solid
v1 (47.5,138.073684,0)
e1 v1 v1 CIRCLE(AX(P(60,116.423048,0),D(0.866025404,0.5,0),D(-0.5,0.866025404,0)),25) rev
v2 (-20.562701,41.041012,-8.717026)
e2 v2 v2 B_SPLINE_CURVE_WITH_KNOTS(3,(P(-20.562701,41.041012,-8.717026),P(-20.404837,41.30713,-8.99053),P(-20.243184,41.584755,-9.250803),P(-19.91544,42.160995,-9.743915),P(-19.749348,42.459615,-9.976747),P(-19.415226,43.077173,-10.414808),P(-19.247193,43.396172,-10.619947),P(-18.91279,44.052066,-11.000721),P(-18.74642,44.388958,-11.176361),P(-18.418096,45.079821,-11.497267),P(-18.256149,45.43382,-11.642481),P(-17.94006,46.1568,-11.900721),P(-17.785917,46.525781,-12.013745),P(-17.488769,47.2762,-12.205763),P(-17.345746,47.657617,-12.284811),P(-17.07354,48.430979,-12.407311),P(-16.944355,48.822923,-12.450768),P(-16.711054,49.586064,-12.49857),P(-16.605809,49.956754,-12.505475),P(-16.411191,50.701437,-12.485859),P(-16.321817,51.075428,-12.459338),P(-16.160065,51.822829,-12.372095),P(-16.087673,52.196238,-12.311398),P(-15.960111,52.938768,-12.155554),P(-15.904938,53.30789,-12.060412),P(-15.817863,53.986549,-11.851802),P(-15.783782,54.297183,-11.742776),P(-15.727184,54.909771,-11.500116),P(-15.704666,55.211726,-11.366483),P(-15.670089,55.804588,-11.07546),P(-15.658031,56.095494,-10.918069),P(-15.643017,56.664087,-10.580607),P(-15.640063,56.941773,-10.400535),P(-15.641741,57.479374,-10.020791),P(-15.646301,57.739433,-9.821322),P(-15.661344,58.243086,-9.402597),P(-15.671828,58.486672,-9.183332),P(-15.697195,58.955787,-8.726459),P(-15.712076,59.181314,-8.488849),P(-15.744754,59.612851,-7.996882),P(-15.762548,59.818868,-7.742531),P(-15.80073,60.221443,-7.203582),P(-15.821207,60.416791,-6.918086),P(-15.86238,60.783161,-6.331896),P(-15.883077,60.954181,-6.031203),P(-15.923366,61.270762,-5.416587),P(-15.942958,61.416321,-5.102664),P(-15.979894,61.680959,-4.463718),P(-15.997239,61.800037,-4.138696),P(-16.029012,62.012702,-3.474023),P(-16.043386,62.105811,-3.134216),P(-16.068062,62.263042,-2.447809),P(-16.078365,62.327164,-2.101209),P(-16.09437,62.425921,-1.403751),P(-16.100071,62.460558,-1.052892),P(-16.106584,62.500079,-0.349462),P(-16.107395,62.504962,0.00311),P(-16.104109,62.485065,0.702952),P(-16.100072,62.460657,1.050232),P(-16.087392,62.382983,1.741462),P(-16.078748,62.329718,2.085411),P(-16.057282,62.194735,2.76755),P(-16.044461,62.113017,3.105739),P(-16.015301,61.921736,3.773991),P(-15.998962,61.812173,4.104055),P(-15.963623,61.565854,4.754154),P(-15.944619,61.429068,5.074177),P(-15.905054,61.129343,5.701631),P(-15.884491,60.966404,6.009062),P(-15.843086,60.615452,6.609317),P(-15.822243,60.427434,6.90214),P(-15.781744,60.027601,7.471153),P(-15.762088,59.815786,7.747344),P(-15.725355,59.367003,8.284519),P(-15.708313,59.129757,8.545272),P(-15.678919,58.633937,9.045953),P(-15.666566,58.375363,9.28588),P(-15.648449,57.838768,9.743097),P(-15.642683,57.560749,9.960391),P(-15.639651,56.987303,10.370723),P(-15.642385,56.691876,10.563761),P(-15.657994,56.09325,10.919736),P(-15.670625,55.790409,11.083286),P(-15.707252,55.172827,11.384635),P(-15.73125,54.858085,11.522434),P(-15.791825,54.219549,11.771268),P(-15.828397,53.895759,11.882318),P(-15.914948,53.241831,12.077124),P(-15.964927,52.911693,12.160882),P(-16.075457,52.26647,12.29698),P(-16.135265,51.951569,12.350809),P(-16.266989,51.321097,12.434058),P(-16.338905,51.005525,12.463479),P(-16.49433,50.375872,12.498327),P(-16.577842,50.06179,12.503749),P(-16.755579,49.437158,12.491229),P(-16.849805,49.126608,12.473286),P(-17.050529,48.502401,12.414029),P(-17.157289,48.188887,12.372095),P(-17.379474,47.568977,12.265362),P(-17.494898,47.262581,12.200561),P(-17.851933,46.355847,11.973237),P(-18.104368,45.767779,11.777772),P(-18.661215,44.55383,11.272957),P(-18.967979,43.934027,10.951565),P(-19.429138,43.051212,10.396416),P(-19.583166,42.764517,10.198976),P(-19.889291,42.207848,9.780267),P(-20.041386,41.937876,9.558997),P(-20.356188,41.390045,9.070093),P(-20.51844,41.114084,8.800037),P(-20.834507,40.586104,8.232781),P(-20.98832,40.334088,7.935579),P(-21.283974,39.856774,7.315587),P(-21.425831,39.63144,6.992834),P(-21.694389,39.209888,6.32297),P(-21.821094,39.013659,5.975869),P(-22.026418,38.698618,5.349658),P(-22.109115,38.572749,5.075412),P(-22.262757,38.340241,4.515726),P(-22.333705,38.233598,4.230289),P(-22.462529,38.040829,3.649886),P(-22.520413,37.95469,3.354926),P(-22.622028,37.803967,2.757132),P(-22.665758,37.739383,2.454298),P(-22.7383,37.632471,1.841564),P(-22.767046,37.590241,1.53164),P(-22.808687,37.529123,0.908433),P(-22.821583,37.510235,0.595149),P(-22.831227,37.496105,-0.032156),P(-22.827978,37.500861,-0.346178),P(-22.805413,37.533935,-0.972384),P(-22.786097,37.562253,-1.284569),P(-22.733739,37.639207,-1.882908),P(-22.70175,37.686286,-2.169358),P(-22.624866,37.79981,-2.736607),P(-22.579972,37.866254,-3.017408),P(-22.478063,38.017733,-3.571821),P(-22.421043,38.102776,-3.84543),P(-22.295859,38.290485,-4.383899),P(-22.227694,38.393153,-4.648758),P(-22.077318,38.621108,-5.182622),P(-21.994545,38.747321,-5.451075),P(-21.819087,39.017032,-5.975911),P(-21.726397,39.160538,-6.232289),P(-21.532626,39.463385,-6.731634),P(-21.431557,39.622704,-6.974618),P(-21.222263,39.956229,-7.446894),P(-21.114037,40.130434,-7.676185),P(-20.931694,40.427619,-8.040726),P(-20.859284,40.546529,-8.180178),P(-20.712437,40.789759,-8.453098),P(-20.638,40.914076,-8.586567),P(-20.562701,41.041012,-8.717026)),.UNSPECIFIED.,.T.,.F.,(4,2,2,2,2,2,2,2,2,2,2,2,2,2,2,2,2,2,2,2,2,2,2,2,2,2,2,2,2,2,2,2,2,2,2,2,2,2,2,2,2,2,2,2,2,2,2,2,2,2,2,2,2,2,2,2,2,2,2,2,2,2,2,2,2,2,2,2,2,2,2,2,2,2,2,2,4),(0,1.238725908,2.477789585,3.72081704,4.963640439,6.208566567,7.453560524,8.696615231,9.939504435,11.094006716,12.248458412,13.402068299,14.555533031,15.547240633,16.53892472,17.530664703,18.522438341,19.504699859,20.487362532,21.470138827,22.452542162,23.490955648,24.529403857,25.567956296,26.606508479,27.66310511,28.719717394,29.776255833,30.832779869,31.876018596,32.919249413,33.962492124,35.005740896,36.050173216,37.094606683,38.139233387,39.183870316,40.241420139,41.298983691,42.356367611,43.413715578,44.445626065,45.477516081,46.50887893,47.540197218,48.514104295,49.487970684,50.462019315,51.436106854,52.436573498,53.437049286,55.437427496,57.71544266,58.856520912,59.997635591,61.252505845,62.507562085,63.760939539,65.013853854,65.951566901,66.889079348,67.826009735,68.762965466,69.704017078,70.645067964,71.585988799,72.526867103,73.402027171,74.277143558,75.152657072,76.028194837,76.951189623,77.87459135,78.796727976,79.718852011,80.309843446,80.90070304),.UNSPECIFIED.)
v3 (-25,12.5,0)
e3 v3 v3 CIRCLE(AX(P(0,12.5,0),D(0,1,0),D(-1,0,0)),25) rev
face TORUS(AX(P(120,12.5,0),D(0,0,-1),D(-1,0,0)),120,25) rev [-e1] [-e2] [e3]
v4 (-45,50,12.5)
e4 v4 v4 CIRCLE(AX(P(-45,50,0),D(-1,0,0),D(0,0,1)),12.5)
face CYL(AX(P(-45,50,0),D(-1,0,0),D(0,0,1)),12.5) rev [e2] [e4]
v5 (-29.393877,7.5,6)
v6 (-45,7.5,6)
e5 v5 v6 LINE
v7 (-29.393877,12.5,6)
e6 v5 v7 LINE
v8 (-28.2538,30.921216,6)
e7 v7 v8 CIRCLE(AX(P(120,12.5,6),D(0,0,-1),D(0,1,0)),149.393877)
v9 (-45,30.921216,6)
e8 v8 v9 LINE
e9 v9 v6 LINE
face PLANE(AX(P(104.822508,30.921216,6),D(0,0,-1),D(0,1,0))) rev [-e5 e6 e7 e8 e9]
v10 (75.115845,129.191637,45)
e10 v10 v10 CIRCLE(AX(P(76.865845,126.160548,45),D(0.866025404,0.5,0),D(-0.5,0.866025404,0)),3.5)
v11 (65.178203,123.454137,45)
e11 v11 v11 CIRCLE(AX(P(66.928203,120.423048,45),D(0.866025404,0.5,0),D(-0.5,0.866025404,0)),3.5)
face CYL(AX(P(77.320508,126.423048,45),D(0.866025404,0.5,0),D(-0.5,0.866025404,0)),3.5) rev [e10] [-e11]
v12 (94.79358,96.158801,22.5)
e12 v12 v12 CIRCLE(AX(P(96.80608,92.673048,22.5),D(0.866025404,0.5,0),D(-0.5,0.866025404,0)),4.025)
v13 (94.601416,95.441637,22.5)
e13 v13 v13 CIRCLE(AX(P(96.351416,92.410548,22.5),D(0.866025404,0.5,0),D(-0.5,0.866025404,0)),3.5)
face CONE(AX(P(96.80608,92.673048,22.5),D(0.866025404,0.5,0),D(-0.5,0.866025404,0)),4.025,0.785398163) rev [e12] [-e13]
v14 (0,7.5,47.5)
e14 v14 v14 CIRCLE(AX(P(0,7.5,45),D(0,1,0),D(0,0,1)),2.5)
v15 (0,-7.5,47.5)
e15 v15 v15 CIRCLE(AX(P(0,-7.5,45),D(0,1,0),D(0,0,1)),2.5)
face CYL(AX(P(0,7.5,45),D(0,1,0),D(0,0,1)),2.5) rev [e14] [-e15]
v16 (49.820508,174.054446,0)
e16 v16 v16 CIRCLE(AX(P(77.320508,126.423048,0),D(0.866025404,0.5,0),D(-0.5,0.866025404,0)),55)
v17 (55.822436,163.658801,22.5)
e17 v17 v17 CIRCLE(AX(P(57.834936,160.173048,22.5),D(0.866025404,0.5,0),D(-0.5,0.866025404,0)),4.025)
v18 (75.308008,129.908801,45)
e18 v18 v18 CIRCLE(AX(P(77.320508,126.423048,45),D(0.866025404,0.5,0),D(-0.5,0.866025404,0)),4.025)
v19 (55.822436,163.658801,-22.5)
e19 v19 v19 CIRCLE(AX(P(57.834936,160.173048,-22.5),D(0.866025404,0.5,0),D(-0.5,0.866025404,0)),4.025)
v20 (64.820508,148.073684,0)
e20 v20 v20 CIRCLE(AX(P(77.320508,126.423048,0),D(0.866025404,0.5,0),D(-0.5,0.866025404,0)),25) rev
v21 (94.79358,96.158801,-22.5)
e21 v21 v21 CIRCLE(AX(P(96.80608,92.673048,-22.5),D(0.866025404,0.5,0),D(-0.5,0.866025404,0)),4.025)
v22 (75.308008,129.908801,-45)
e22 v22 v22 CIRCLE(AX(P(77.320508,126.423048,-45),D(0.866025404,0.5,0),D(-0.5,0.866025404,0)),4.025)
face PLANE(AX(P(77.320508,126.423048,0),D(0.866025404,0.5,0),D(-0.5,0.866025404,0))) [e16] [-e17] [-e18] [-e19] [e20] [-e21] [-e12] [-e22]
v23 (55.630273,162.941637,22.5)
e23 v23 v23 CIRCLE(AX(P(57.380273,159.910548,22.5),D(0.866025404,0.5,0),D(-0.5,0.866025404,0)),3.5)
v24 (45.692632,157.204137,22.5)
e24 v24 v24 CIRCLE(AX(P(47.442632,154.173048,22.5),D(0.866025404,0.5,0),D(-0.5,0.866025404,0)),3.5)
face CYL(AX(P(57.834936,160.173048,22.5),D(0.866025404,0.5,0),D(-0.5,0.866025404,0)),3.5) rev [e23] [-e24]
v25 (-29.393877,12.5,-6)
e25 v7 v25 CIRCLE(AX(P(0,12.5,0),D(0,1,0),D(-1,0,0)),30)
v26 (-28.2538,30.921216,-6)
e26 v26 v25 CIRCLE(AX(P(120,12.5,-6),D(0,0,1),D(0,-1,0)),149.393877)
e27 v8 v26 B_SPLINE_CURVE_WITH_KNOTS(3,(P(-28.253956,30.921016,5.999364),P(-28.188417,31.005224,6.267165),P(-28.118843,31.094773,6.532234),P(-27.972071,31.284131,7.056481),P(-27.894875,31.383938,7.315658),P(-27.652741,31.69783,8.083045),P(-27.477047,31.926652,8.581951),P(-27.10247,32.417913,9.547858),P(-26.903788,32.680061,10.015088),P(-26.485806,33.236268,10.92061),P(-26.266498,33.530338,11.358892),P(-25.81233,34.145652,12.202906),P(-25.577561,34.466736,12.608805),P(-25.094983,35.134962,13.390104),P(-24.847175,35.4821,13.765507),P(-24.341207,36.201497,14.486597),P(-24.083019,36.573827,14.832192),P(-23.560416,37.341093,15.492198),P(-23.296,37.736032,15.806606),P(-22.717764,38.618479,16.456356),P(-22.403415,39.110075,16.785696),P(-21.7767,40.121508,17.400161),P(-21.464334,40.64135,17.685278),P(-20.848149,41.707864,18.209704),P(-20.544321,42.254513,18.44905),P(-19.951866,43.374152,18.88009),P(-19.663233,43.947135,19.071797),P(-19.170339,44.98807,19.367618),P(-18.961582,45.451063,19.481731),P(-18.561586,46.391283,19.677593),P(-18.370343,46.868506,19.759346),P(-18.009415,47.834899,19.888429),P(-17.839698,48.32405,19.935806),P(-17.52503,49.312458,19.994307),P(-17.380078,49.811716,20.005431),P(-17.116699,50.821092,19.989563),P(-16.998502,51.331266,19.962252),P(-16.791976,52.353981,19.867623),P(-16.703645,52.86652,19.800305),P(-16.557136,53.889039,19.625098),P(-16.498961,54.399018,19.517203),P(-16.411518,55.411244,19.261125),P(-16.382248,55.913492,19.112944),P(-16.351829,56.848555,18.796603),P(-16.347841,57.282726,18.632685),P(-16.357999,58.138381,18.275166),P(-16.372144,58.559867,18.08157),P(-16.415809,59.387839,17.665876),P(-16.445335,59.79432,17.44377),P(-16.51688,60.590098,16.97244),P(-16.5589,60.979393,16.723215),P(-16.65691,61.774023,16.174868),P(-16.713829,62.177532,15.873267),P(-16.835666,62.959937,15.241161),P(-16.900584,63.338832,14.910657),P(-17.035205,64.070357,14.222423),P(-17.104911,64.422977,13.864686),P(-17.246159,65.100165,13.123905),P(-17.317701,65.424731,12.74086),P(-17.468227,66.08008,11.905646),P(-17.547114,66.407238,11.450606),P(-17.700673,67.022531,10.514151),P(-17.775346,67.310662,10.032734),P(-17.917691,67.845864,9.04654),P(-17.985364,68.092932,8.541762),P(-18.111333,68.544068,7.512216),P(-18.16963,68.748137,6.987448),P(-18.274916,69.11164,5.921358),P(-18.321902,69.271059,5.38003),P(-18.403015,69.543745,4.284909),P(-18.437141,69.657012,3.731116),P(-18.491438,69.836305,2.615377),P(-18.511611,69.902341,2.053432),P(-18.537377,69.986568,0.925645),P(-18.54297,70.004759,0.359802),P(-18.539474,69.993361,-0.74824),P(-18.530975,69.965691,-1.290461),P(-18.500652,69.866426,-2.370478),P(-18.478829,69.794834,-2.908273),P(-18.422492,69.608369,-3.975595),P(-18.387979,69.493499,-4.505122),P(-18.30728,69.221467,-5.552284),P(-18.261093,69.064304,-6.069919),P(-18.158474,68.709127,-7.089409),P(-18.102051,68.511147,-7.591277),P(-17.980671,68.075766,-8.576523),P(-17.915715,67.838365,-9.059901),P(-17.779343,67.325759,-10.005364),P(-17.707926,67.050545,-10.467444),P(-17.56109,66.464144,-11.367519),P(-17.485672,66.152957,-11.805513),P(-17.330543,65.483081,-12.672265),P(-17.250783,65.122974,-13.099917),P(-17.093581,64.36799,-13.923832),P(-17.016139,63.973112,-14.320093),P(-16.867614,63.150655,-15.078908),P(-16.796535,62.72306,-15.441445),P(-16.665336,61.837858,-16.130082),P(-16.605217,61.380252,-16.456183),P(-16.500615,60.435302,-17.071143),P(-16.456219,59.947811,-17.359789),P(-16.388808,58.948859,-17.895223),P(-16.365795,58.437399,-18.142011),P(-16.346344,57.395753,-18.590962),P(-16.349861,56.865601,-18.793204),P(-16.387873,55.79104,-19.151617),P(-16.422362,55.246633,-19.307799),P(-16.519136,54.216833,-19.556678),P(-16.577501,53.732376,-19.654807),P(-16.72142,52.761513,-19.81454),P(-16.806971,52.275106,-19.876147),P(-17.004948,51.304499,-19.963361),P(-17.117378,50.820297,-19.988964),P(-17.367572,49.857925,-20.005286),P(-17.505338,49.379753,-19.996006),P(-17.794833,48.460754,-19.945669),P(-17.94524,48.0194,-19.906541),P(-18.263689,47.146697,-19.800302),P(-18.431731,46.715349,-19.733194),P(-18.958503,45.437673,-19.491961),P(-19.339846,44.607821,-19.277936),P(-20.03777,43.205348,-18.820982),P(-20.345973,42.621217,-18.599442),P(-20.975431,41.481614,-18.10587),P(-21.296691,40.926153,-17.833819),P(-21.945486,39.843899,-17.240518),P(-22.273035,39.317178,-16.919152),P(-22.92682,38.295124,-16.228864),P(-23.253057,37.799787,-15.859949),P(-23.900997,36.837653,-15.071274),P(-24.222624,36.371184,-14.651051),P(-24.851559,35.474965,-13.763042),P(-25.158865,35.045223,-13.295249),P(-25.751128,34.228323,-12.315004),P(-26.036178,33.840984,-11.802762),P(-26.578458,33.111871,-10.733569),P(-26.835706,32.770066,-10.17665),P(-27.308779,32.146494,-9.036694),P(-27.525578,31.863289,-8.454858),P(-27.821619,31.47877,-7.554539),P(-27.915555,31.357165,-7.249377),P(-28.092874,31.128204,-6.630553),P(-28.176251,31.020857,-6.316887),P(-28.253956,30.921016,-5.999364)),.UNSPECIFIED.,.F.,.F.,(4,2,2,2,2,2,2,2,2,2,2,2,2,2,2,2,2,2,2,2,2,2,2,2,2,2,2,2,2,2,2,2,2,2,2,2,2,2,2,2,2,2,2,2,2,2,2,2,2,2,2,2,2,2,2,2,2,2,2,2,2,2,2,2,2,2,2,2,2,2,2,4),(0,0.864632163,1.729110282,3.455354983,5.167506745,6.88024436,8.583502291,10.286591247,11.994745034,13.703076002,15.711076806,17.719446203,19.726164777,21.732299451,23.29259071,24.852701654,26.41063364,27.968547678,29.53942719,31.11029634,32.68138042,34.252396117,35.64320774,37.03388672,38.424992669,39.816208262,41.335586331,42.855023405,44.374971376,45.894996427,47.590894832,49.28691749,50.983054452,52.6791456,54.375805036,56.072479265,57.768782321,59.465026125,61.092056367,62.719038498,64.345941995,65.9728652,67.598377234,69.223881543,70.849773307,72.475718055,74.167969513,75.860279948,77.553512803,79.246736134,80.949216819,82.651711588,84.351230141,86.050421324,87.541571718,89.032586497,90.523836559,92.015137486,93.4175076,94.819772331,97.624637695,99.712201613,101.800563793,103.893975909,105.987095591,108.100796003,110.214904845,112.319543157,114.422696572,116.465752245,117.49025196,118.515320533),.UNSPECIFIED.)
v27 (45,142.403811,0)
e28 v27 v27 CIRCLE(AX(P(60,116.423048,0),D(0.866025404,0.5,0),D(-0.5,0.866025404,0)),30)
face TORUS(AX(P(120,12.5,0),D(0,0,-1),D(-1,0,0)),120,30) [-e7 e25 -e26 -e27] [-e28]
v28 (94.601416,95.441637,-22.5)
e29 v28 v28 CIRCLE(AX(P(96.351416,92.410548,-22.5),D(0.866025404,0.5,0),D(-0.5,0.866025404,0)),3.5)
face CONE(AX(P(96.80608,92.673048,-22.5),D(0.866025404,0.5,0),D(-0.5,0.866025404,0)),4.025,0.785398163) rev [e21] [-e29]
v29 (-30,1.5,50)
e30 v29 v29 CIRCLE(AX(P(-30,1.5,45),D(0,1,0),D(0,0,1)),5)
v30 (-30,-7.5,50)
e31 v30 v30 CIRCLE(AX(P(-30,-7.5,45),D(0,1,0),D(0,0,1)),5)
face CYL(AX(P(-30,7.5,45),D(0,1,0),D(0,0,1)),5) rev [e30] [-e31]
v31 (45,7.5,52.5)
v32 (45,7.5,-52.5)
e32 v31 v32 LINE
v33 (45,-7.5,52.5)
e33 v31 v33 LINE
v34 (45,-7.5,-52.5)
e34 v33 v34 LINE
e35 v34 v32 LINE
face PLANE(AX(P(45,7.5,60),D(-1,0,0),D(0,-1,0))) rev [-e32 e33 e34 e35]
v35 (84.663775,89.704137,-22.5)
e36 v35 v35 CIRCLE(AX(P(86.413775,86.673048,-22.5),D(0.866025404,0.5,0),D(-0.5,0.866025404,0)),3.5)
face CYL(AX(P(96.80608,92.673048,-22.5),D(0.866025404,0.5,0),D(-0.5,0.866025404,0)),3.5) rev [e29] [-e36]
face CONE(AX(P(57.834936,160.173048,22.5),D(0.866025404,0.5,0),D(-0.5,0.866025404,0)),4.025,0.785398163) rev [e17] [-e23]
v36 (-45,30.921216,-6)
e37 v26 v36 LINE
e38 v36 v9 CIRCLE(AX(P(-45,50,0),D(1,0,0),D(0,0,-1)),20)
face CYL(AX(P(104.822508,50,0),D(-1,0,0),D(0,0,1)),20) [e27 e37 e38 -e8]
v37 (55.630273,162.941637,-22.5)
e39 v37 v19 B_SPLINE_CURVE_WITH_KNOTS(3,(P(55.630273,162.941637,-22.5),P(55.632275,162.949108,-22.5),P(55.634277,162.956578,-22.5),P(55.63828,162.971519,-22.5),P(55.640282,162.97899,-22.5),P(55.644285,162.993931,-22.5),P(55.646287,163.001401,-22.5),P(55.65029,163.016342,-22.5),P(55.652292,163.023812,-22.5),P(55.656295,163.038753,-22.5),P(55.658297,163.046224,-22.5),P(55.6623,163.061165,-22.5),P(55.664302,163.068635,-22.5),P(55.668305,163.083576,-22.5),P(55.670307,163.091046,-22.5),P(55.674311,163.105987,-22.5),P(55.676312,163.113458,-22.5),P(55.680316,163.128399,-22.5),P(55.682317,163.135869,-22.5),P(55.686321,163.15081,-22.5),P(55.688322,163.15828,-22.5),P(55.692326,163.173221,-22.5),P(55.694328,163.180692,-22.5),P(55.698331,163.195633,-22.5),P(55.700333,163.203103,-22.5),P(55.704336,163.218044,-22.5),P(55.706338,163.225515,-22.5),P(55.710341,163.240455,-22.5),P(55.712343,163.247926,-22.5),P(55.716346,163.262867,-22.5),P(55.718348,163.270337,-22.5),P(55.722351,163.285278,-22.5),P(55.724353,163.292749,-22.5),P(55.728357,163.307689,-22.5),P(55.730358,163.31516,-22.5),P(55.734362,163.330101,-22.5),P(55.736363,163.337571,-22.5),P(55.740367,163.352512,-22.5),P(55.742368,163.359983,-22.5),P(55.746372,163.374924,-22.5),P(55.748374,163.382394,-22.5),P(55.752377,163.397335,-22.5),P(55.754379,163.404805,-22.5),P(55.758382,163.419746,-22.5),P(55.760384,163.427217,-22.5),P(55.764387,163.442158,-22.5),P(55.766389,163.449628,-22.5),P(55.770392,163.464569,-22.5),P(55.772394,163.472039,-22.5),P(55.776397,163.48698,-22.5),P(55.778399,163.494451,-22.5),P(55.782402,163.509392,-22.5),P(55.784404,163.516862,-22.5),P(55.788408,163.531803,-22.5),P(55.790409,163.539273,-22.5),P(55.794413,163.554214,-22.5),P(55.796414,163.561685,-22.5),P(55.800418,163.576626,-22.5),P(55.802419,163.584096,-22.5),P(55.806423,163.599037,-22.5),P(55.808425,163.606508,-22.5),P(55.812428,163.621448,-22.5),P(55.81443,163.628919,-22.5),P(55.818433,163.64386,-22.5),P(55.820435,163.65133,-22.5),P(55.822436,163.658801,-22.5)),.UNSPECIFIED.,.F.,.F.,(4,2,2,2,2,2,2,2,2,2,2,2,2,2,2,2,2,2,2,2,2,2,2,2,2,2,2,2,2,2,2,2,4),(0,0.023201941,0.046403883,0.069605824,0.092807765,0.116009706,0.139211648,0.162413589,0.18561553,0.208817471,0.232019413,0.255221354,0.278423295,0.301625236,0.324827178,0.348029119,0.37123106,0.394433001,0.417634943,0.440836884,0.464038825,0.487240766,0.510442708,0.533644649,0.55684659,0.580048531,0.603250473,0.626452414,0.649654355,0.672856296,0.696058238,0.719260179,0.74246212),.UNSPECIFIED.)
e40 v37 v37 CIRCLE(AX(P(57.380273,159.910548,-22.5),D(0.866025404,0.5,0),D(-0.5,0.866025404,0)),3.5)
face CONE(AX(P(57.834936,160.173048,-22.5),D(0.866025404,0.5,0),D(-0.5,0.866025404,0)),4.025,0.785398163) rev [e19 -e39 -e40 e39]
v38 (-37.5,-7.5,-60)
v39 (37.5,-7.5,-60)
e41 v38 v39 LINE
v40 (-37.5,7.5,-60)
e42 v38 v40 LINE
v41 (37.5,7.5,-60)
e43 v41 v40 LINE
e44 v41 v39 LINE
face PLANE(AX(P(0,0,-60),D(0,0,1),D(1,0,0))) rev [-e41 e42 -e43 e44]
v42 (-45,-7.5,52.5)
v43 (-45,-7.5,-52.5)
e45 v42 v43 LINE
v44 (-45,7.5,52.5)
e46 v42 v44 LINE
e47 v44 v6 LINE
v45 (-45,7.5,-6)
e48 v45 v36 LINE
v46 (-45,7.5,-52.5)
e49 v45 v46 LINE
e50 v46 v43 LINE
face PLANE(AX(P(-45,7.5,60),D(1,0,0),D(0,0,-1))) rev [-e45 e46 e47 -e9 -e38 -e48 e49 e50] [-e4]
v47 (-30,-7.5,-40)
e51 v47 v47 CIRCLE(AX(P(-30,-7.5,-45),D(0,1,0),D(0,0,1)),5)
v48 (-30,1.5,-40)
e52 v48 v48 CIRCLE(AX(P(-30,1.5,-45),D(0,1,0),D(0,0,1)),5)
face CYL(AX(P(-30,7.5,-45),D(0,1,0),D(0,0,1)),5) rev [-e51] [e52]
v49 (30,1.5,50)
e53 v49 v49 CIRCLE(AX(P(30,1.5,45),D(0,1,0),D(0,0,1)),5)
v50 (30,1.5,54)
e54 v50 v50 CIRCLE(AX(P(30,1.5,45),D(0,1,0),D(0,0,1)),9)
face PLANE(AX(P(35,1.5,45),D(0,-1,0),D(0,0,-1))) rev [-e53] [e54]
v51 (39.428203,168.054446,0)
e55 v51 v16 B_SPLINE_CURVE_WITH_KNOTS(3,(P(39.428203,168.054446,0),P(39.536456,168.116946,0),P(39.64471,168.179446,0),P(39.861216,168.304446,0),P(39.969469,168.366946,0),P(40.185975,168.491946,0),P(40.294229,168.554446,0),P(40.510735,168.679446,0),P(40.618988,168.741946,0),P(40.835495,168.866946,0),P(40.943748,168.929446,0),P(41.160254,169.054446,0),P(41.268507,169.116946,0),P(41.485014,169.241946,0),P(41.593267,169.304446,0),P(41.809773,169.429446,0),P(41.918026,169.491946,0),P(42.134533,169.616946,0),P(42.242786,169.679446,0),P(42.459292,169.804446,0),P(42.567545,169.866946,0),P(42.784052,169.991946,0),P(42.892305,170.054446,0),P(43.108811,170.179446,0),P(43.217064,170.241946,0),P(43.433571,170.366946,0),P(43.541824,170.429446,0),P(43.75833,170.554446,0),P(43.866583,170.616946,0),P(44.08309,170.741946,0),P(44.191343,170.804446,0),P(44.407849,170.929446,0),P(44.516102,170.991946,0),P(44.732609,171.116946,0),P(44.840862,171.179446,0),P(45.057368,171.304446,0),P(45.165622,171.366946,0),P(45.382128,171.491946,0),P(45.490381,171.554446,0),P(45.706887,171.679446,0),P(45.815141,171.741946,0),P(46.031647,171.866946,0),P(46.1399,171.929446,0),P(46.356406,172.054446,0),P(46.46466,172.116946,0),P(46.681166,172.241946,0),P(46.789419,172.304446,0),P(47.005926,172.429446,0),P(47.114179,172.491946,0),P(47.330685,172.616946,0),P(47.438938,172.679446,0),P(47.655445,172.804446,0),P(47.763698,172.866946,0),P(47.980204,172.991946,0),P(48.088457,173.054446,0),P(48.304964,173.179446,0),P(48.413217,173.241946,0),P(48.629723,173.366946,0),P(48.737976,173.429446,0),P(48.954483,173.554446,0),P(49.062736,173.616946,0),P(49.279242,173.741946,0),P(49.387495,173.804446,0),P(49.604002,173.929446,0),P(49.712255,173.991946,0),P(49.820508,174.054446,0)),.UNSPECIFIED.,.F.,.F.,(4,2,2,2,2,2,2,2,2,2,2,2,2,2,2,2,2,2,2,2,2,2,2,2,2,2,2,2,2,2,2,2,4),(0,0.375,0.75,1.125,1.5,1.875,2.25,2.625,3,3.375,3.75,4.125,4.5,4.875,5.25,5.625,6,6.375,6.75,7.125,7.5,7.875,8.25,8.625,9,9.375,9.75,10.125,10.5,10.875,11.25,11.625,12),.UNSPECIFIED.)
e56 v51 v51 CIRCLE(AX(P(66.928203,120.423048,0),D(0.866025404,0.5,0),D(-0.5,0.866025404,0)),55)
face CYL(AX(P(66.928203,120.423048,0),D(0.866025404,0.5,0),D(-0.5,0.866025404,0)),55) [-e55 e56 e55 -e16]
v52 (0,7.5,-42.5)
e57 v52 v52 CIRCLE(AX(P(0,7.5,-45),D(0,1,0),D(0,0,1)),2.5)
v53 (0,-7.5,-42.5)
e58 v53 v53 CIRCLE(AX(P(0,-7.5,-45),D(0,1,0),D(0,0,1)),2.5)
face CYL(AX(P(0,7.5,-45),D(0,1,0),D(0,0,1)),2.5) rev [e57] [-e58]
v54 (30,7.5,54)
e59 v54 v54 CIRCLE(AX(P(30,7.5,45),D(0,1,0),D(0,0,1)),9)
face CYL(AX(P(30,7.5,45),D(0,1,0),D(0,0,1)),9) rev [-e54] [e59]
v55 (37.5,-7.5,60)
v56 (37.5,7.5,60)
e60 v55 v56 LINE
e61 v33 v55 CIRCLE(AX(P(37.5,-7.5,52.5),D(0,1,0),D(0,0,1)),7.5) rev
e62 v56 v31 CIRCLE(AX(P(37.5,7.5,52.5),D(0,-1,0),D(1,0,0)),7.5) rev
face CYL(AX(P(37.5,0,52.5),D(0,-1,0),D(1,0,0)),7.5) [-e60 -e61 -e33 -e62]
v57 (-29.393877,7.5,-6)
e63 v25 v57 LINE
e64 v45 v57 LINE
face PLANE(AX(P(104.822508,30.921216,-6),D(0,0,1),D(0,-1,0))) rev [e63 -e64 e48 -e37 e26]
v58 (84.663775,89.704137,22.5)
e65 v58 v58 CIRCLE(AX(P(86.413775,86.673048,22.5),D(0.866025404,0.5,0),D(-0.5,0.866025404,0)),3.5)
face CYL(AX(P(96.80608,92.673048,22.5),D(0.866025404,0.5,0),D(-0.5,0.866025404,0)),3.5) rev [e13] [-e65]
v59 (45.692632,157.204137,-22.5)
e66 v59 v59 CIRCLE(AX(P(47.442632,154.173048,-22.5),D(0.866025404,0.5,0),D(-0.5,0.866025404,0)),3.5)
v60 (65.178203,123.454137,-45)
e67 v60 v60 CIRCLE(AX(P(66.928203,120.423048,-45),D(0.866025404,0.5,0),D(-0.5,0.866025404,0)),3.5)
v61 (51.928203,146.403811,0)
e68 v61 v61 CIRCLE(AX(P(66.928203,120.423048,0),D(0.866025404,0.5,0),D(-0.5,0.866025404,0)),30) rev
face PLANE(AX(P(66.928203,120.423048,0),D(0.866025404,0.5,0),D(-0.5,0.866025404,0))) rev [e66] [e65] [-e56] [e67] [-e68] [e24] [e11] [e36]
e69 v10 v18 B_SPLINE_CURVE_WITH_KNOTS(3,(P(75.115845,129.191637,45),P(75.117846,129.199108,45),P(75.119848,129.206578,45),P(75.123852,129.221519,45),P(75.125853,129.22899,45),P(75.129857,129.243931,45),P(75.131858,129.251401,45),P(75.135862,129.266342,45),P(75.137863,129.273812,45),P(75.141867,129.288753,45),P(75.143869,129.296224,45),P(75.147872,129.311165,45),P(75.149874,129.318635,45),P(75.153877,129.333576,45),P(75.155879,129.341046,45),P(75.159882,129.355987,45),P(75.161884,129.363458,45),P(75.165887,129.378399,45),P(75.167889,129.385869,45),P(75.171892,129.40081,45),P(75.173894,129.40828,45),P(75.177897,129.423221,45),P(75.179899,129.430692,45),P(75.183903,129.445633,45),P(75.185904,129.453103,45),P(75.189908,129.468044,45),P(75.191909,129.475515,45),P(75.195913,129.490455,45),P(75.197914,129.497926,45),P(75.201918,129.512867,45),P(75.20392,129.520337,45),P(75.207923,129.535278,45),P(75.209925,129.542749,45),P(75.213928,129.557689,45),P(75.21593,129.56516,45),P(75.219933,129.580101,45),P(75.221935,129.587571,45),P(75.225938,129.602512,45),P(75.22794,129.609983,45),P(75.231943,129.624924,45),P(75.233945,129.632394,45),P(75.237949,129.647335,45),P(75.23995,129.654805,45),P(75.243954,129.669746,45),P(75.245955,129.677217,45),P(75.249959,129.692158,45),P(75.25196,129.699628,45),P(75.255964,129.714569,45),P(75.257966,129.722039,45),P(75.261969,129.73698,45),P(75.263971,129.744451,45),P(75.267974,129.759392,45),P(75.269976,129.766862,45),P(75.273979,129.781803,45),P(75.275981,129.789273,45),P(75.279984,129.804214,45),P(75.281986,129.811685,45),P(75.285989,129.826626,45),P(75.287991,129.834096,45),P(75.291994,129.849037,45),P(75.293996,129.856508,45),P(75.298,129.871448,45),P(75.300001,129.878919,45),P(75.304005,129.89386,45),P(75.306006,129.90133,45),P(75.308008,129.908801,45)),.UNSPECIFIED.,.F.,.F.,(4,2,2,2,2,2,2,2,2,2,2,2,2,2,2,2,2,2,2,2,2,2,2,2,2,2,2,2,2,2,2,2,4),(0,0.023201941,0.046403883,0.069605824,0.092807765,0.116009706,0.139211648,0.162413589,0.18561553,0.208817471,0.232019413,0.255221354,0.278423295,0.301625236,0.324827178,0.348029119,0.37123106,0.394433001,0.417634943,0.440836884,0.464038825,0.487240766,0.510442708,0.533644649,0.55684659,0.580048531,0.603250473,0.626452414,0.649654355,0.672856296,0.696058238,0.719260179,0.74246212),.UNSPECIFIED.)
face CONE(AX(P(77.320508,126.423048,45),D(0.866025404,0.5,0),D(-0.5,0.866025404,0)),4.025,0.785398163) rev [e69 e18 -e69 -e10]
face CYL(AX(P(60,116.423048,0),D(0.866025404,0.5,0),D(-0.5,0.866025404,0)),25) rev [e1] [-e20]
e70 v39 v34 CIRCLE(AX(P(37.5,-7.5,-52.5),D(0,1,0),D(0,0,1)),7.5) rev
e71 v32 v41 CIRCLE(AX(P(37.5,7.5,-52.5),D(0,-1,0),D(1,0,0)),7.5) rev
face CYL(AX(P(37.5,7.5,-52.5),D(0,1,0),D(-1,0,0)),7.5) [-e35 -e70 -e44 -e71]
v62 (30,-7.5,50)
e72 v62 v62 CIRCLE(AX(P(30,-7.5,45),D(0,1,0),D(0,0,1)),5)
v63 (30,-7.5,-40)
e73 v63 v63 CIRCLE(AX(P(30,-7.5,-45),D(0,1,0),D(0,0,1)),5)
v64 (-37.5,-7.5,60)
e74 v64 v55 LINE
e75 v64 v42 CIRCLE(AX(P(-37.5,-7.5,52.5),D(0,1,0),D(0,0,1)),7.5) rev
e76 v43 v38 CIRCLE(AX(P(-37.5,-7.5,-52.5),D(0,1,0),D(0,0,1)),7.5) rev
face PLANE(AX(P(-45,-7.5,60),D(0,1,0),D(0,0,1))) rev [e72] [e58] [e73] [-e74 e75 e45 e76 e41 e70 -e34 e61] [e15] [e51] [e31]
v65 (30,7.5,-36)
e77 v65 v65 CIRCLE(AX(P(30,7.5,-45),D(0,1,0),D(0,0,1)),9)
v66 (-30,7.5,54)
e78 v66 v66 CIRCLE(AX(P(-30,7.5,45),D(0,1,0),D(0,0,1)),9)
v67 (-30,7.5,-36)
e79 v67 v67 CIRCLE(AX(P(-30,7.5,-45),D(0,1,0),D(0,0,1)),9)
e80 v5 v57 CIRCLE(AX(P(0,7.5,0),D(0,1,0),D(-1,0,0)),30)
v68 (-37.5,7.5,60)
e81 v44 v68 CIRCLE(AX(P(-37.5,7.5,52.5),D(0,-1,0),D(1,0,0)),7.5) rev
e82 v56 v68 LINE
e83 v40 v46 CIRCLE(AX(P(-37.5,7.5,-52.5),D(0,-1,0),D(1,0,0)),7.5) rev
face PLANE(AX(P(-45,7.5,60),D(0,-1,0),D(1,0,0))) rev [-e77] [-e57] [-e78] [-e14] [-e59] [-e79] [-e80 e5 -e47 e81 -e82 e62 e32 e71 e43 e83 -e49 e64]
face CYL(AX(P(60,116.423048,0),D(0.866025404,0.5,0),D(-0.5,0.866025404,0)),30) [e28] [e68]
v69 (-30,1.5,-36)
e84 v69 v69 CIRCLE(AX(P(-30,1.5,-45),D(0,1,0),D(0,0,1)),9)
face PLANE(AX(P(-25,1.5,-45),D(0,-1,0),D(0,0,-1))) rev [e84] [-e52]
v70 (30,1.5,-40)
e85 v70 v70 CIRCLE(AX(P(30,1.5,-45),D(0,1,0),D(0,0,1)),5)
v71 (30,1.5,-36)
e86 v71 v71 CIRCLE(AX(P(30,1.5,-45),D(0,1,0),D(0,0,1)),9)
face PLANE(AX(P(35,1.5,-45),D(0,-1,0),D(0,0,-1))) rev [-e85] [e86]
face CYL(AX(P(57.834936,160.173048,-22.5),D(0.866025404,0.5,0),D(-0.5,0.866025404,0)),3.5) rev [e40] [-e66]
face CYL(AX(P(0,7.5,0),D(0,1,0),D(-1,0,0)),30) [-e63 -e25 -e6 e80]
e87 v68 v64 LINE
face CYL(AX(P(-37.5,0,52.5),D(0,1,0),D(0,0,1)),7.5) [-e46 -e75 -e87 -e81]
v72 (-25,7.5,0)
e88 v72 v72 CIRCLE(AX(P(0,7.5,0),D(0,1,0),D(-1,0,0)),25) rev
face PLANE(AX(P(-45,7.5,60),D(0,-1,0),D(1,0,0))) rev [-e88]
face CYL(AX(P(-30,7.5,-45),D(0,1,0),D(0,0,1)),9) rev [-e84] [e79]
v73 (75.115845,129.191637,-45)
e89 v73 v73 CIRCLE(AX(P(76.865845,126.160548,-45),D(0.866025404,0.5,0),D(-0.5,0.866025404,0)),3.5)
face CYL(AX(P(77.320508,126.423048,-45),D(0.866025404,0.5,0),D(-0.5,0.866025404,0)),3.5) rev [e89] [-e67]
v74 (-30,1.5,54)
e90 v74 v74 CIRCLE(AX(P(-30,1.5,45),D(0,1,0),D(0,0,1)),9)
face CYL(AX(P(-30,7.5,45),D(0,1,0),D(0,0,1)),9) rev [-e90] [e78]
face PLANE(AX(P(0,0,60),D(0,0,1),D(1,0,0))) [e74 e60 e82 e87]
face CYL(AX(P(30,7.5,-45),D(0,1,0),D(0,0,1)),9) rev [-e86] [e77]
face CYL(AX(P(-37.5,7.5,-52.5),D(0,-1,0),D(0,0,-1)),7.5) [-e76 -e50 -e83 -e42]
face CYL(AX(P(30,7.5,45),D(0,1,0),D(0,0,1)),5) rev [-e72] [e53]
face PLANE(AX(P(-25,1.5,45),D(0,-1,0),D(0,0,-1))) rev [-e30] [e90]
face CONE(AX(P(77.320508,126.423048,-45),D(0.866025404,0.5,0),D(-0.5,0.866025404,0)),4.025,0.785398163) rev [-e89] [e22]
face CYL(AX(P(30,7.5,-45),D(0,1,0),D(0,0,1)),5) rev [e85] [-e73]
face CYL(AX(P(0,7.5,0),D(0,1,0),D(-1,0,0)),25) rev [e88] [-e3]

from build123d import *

# Parameters (mm, degrees)
SKETCH1_W                       = 90
SKETCH1_H                       = 15
BOSS_EXTRUDE1_DEPTH             = 60
SKETCH3_R                       = 30
SKETCH3_R_2                     = 25
SKETCH4_R                       = 55
SKETCH4_R_2                     = 25
BOSS_EXTRUDE2_DEPTH             = 12
M8X1_0_TAPPED_HOLE1_D           = 7
M8X1_0_TAPPED_HOLE1_CSINK_D     = 8.05
M8X1_0_TAPPED_HOLE1_CSINK_ANGLE = 90
FILLET1_R                       = 7.5
HOLE2_D                         = 10
HOLE2_CBORE_D                   = 18
HOLE2_CBORE_DEPTH               = 6
MIRROR2_COPY_1_D                = 10
MIRROR2_COPY_1_CBORE_D          = 18
MIRROR2_COPY_1_CBORE_DEPTH      = 6
HOLE3_D                         = 5
BOSS_EXTRUDE3_REACH             = 239.363
HOLE4_REACH                     = 239.363
HOLE4_BORE_R                    = 12.5


# Read off the part's stored shape, not the designer's step: CirPattern1
with BuildPart() as part:
    # Sketch1 → Boss-Extrude1 (new, symmetric)
    with BuildSketch(Plane.XY):
        Rectangle(SKETCH1_W, SKETCH1_H)
    extrude(amount=BOSS_EXTRUDE1_DEPTH, both=True)

    # Sweep1: sweep along a path in Sketch2
    with BuildLine(Plane.XY) as sweep1_path:
        Line((0, 7.5), (0, 12.5))
        ThreePointArc((0, 12.5), (16.076951546, 72.5), (60, 116.423048454))
        Line((60, 116.423048454), (77.320508076, 126.423048454))
    # Sketch3 → Sweep1 (sweep)
    with BuildSketch(Plane(origin=(0, 7.5, 0), x_dir=(1, 0, 0), z_dir=(0, 1, 0))):
        Circle(SKETCH3_R)
        Circle(SKETCH3_R_2, mode=Mode.SUBTRACT)
    sweep(path=sweep1_path.line)

    # Sketch4 → Boss-Extrude2 (add)
    with BuildSketch(Plane(origin=(112.733166849, 65.086524227, 0), x_dir=(0, 0, -1), z_dir=(0.8660254037844357, 0.5000000000000052, 0))):
        with Locations(Location((0, 70.825317547, 0), (0, 0, 90))):
            Circle(SKETCH4_R)
        with Locations(Location((0, 70.825317547, 0), (0, 0, 90))):
            Circle(SKETCH4_R_2, mode=Mode.SUBTRACT)
    extrude(amount=-BOSS_EXTRUDE2_DEPTH)

    # M8x1.0 Tapped Hole1 (through all)
    with Locations(Plane(origin=(112.733166849, 65.086524227, 0), x_dir=(0, 0, -1), z_dir=(0.8660254037844357, 0.5000000000000052, 0))):
        with Locations((45, 70.825317547)):
            CounterSinkHole(M8X1_0_TAPPED_HOLE1_D / 2, M8X1_0_TAPPED_HOLE1_CSINK_D / 2, counter_sink_angle=M8X1_0_TAPPED_HOLE1_CSINK_ANGLE)

    # CirPattern1 outline → CirPattern1 (revolve, cut)
    with BuildSketch(Plane(origin=(-15.927087189, 27.586524227, -22.5), x_dir=(0.5000000000000049, -0.8660254037844358, 0), z_dir=(0, 0, 1))):
        Polygon((0, 118.173048454), (3.5, 118.173048454), (3.5, 129.648048454), (4.025, 130.173048454), (0, 130.173048454), align=None)
    revolve(axis=Axis((-15.927087189, 27.586524227, -22.5), (0.8660254037844358, 0.5000000000000049, 0)), mode=Mode.SUBTRACT)

    # CirPattern1 2 outline → CirPattern1 2 (revolve, cut)
    with BuildSketch(Plane(origin=(-15.927087189, 27.586524227, 22.5), x_dir=(0.500000000000004, -0.8660254037844363, 0), z_dir=(0, 0, 1))):
        Polygon((0, 118.173048454), (3.5, 118.173048454), (3.5, 129.648048454), (4.025, 130.173048454), (0, 130.173048454), align=None)
    revolve(axis=Axis((-15.927087189, 27.586524227, 22.5), (0.8660254037844363, 0.500000000000004, 0)), mode=Mode.SUBTRACT)

    # CirPattern1 3 outline → CirPattern1 3 (revolve, cut)
    with BuildSketch(Plane(origin=(-35.412658774, 61.336524227, 45), x_dir=(0.500000000000004, -0.8660254037844363, 0), z_dir=(0, 0, 1))):
        Polygon((0, 118.173048454), (3.5, 118.173048454), (3.5, 129.648048454), (4.025, 130.173048454), (0, 130.173048454), align=None)
    revolve(axis=Axis((-35.412658774, 61.336524227, 45), (0.8660254037844363, 0.500000000000004, 0)), mode=Mode.SUBTRACT)

    # CirPattern1 4 outline → CirPattern1 4 (revolve, cut)
    with BuildSketch(Plane(origin=(-54.898230359, 95.086524227, 22.5), x_dir=(0.5000000000000049, -0.8660254037844358, 0), z_dir=(0, 0, 1))):
        Polygon((0, 118.173048454), (3.5, 118.173048454), (3.5, 129.648048454), (4.025, 130.173048454), (0, 130.173048454), align=None)
    revolve(axis=Axis((-54.898230359, 95.086524227, 22.5), (0.8660254037844358, 0.5000000000000049, 0)), mode=Mode.SUBTRACT)

    # CirPattern1 5 outline → CirPattern1 5 (revolve, cut)
    with BuildSketch(Plane(origin=(-54.898230359, 95.086524227, -22.5), x_dir=(0.5000000000000049, -0.8660254037844358, 0), z_dir=(0, 0, 1))):
        Polygon((0, 118.173048454), (3.5, 118.173048454), (3.5, 129.648048454), (4.025, 130.173048454), (0, 130.173048454), align=None)
    revolve(axis=Axis((-54.898230359, 95.086524227, -22.5), (0.8660254037844358, 0.5000000000000049, 0)), mode=Mode.SUBTRACT)

    # Fillet1
    fillet1_edges = [part.edges().sort_by_distance(p)[0] for p in [
        (-45, 0, 60),
        (45, 0, 60),
        (-45, 0, -60),
        (45, 0, -60),
    ]]
    fillet(fillet1_edges, radius=FILLET1_R)

    # Hole2 (through all)
    with Locations(Plane(origin=(0, 7.5, 0), x_dir=(1, 0, 0), z_dir=(0, 1, 0))):
        with Locations((-30, 45)):
            hole2 = CounterBoreHole(HOLE2_D / 2, HOLE2_CBORE_D / 2, HOLE2_CBORE_DEPTH)

    # Mirror1: Hole2 across plane
    add(hole2.mirror(Plane(origin=(0, 0, 0), x_dir=(0, 0, 1), z_dir=(1, 0, 0))), mode=Mode.SUBTRACT)

    # Mirror2: Hole2 across plane
    add(hole2.mirror(Plane.XY), mode=Mode.SUBTRACT)

    # Mirror2 copy 1 (through all)
    with Locations(Plane(origin=(0, 7.5, 0), x_dir=(-1, 0, 0), z_dir=(0, 1, 0))):
        with Locations((-30, 45)):
            CounterBoreHole(MIRROR2_COPY_1_D / 2, MIRROR2_COPY_1_CBORE_D / 2, MIRROR2_COPY_1_CBORE_DEPTH)

    # Hole3 (through all)
    with Locations(Plane(origin=(0, 7.5, 0), x_dir=(1, 0, 0), z_dir=(0, 1, 0))):
        with Locations((0, 45)):
            hole3 = Hole(HOLE3_D / 2)

    # Mirror3: Hole3 across plane
    add(hole3.mirror(Plane.XY), mode=Mode.SUBTRACT)

    # Sketch14 → Boss-Extrude3 (add, up to next)
    with BuildSketch(Plane(origin=(-45, 0, 0), x_dir=(0, 0, -1), z_dir=(1, 0, 0)), mode=Mode.PRIVATE) as boss_extrude3_sk1:
        with BuildLine():
            Line((6, 30.921215972), (6, -7.5))
            Line((6, -7.5), (-6, -7.5))
            Line((-6, -7.5), (-6, 30.921215972))
            ThreePointArc((-6, 30.921215972), (0, 70), (6, 30.921215972))
        make_face()
    boss_extrude3_tool1 = extrude(boss_extrude3_sk1.sketch, amount=BOSS_EXTRUDE3_REACH, mode=Mode.PRIVATE) - part.part
    add(boss_extrude3_tool1.solids().sort_by_distance((-45, 39.762246, 0))[0])

    # Hole4 bore → Hole4 (cut, up to next)
    with BuildSketch(Plane.ZY.offset(45), mode=Mode.PRIVATE) as hole4_sk1:
        with Locations((0, 50)):
            Circle(HOLE4_BORE_R)
    hole4_tool1 = extrude(hole4_sk1.sketch, amount=-HOLE4_REACH, mode=Mode.PRIVATE) & part.part
    add(hole4_tool1.solids().sort_by_distance((-45, 50, 0))[0], mode=Mode.SUBTRACT)


solid = part.part
